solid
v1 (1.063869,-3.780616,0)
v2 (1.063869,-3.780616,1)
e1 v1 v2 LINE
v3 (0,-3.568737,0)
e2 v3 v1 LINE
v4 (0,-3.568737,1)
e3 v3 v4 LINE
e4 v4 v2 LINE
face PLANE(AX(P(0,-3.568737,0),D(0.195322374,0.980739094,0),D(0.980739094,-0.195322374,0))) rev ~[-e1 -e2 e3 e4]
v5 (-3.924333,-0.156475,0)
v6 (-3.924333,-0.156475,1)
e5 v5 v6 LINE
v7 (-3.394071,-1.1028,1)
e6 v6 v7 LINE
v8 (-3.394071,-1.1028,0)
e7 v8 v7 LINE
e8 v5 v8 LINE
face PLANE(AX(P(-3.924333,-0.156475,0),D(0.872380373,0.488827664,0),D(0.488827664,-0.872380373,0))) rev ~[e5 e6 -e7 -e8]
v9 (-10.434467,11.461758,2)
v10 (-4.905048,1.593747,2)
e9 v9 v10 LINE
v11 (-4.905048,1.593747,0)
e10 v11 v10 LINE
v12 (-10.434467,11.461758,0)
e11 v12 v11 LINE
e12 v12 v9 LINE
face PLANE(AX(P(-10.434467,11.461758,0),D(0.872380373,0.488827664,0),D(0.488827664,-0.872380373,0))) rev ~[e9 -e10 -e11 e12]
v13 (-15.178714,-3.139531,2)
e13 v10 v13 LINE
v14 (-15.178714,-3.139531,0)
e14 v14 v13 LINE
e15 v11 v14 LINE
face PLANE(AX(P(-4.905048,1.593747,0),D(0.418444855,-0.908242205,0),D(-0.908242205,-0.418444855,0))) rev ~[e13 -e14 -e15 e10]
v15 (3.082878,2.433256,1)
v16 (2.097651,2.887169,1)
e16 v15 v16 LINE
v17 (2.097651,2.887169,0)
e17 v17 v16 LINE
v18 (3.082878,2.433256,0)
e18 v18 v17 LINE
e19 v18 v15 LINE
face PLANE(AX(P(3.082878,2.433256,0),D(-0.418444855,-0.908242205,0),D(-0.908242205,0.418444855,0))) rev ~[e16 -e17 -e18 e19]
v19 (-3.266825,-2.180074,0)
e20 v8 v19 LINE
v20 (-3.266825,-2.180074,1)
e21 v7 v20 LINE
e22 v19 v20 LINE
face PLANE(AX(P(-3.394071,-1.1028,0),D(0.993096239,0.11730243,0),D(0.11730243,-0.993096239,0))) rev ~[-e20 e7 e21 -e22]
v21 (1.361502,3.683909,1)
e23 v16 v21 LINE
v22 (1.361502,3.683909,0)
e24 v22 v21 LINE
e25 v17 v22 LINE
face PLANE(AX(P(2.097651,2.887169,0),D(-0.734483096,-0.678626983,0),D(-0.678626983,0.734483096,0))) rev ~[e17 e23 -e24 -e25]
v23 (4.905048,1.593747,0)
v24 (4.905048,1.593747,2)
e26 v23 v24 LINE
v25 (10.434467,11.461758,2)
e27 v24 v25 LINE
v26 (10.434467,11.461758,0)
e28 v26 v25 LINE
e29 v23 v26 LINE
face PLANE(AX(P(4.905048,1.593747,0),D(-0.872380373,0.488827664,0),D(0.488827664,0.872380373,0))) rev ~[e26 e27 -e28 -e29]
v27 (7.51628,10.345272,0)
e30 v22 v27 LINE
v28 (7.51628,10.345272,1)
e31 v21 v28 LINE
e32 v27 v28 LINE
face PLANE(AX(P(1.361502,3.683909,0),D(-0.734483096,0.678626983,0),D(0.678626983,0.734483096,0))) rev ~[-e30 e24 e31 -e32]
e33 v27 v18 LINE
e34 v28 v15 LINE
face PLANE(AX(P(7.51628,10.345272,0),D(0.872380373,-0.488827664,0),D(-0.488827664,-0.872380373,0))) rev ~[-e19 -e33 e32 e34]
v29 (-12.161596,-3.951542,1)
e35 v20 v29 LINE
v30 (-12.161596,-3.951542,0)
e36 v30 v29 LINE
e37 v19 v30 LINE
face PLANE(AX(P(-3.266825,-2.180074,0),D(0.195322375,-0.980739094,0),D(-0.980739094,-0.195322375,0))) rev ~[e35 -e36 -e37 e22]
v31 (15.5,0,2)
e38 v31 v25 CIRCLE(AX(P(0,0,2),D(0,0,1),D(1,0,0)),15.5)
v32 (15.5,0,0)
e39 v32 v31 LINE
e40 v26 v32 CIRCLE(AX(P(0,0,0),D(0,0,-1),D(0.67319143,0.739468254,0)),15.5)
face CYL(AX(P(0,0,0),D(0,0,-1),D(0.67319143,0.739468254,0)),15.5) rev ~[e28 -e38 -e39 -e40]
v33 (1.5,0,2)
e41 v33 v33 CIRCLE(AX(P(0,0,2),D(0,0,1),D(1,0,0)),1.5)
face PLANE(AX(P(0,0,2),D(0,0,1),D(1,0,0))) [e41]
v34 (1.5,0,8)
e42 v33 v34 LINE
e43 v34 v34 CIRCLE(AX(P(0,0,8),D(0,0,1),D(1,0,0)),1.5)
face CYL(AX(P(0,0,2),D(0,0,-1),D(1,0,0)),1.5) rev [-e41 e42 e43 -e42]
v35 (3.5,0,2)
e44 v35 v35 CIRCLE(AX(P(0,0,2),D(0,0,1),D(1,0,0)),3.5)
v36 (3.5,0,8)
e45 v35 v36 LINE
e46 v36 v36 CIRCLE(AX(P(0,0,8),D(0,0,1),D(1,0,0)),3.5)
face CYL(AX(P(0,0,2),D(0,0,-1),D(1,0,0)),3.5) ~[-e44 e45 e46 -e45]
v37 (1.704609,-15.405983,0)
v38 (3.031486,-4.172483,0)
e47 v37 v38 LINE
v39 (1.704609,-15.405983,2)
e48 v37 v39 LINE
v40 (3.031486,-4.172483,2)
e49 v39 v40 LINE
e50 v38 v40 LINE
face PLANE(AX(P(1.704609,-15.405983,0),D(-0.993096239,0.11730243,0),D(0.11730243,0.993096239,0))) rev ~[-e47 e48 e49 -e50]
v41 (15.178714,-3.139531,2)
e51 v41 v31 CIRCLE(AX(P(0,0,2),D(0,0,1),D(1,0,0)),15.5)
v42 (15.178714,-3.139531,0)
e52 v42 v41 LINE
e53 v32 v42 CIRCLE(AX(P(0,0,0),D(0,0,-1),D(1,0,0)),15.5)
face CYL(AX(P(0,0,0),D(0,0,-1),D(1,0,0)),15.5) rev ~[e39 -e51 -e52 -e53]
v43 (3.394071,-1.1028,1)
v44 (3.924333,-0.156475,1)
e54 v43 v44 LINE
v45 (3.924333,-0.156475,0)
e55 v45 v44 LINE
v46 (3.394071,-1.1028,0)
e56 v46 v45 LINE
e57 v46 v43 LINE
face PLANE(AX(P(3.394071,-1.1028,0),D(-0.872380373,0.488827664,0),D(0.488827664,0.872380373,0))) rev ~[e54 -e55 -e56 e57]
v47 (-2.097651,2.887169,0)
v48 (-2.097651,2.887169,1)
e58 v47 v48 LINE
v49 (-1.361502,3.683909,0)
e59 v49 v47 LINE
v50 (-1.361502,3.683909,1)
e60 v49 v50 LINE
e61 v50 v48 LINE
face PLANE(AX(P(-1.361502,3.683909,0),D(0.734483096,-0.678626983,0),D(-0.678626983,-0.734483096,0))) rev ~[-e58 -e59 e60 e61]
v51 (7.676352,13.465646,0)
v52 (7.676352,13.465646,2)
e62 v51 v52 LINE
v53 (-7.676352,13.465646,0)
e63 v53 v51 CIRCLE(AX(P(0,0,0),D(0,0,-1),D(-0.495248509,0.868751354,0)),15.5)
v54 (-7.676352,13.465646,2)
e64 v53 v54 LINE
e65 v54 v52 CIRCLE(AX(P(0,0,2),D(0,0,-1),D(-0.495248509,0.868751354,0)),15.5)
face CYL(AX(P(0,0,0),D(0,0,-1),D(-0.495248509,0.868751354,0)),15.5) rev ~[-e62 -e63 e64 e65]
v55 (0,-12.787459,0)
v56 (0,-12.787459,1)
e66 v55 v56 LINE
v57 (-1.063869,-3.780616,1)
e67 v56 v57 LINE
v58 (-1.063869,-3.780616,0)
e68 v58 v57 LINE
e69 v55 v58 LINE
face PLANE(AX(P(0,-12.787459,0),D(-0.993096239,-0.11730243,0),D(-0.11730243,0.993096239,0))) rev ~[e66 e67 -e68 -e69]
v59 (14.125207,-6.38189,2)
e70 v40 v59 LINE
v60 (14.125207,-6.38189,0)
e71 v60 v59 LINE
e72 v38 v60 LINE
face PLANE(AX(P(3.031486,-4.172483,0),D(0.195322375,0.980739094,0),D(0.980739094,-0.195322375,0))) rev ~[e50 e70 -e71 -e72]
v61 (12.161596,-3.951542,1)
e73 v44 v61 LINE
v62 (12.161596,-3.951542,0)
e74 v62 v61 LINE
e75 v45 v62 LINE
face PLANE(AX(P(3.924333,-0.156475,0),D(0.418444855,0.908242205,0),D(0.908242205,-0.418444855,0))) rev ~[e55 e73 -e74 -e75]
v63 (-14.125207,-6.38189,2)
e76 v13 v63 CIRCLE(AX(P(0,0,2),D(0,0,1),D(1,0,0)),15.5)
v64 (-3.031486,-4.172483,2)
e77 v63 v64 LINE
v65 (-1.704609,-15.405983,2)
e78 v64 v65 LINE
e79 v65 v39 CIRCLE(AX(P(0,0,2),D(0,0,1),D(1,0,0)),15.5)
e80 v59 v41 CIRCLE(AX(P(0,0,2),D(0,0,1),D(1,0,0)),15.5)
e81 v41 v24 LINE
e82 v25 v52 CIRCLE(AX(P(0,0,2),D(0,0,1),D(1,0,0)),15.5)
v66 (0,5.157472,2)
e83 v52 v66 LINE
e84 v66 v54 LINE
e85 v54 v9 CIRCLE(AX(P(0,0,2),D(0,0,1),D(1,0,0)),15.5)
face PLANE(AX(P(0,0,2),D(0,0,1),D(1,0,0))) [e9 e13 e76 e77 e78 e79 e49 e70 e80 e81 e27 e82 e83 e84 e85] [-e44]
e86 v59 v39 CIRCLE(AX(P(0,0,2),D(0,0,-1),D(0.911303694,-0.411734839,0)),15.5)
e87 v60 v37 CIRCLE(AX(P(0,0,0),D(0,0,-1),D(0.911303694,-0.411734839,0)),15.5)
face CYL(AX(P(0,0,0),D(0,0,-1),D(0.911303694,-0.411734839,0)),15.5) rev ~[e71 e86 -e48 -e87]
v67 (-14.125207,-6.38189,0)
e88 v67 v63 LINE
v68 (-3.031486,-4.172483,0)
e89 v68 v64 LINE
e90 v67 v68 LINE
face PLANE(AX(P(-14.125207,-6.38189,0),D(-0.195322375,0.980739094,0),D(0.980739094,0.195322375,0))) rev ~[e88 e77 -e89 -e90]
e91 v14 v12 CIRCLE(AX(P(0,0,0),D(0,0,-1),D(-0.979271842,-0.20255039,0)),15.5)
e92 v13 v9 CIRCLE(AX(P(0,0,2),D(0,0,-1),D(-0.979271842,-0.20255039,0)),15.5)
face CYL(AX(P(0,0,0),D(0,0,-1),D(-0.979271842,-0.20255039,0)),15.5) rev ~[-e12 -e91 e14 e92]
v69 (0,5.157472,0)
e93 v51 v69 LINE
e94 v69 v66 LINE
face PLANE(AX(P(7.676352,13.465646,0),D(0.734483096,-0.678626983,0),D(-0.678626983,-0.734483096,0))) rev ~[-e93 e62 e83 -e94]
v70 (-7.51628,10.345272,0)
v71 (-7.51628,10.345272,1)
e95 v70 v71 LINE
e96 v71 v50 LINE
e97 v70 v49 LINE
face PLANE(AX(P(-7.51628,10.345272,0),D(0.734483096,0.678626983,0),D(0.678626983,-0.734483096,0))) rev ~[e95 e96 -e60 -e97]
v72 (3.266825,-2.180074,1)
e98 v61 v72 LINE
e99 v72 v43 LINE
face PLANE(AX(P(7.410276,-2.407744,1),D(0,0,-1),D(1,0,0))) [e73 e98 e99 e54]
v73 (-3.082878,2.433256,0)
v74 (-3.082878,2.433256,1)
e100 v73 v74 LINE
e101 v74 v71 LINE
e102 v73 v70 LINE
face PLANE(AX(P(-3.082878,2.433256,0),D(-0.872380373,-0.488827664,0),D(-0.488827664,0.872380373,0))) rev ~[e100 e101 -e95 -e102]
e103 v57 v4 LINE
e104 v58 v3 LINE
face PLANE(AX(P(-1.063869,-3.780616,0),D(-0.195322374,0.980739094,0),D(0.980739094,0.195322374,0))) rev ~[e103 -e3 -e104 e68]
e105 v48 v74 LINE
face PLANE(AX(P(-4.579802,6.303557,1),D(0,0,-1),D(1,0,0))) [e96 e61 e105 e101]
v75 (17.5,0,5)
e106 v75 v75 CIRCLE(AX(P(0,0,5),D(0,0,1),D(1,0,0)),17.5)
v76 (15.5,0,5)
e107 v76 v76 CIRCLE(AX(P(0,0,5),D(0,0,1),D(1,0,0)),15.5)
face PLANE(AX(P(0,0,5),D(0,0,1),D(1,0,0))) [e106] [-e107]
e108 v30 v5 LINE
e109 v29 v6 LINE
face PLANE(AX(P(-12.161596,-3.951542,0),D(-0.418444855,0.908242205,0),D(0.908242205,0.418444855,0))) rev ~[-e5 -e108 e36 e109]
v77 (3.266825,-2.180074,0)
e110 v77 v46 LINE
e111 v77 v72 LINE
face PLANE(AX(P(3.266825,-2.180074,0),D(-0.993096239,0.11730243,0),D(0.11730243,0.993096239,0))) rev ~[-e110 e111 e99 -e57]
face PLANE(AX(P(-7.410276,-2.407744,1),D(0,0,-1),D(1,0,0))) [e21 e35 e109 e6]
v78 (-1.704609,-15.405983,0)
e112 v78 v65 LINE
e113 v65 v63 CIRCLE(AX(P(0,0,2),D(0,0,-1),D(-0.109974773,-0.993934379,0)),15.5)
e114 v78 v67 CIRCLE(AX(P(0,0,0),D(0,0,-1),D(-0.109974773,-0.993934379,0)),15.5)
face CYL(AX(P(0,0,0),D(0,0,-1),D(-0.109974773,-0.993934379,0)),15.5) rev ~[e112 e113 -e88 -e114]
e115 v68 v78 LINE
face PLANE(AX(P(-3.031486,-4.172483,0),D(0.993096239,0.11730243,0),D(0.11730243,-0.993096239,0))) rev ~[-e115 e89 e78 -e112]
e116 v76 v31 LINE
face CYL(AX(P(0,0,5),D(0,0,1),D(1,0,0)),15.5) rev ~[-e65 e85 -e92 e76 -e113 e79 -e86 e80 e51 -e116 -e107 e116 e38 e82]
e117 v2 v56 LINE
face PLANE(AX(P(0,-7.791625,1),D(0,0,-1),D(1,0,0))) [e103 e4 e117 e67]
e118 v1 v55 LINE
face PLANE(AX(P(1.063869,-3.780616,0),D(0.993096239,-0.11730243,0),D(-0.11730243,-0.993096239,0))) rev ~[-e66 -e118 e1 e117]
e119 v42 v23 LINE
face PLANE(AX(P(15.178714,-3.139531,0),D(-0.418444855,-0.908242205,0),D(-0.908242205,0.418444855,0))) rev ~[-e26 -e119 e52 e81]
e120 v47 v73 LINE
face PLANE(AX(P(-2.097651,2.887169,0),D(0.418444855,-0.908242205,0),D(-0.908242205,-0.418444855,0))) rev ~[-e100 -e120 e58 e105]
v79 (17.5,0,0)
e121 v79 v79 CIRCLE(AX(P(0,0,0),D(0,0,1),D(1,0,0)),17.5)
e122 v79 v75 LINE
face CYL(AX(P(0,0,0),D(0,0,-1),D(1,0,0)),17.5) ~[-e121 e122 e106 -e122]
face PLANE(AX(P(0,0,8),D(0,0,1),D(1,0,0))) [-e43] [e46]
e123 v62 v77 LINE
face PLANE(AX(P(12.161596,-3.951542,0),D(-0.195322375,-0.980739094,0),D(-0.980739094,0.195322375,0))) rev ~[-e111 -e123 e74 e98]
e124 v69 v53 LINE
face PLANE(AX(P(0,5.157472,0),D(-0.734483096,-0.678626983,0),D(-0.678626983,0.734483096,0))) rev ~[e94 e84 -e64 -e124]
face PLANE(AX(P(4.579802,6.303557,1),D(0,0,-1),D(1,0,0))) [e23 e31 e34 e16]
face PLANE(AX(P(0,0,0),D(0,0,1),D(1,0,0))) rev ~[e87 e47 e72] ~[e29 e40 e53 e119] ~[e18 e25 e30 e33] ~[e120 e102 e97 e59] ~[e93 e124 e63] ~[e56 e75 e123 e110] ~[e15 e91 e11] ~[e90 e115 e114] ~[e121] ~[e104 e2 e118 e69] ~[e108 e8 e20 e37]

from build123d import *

# Parameters (mm, degrees)
F0_R     = 17.5
F1_DEPTH = 5
F2_R     = 15.5
F3_DEPTH = 3
F4_R     = 3.5
F4_R_2   = 1.5
F5_DEPTH = 6
F7_DEPTH = 1
F8_DEPTH = 2


with BuildPart() as f1:
    # F0 (on Top) → F1 (new body)
    with BuildSketch(Plane.XY):
        Circle(F0_R)
    extrude(amount=F1_DEPTH)

    # F2 (on face) → F3 (cut)
    with BuildSketch(Plane.XY.offset(5)):
        Circle(F2_R)
    extrude(amount=-F3_DEPTH, mode=Mode.SUBTRACT)

    # F4 (on face) → F5 (join)
    with BuildSketch(Plane.XY.offset(2)):
        Circle(F4_R)
        Circle(F4_R_2, mode=Mode.SUBTRACT)
    extrude(amount=F5_DEPTH)

    # F6 (on face) → F7 (cut)
    with BuildSketch(Plane(origin=(0, 0, 0), x_dir=(1, 0, 0), z_dir=(0, 0, -1))):
        Polygon((-3.9243327608, 0.1564746204), (-3.3940706843, 1.1028004157), (-3.2668253693, 2.1800742948), (-12.161596097, 3.9515421095), align=None)
        Polygon((1.0638693073, 3.7806155611), (0, 12.7874588824), (-1.0638693073, 3.7806155611), (0, 3.5687371109), align=None)
        Polygon((3.2668253693, 2.1800742948), (3.3940706843, 1.1028004157), (3.9243327608, 0.1564746204), (12.161596097, 3.9515421095), align=None)
        Polygon((3.0828784209, -2.4332555489), (2.0976510431, -2.8871689712), (1.361501722, -3.6839089274), (7.5162797454, -10.3452715508), align=None)
        Polygon((-1.361501722, -3.6839089274), (-2.0976510431, -2.8871689712), (-3.0828784209, -2.4332555489), (-7.5162797454, -10.3452715508), align=None)
    extrude(amount=-F7_DEPTH, mode=Mode.SUBTRACT)

    # F6 (on face) → F8 (cut)
    with BuildSketch(Plane(origin=(0, 0, 0), x_dir=(1, 0, 0), z_dir=(0, 0, -1))):
        with BuildLine():
            Line((7.6763518896, -13.4656459803), (0, -5.1574724983))
            Line((0, -5.1574724983), (-7.6763518896, -13.4656459803))
            ThreePointArc((-7.6763518896, -13.4656459803), (0, -15.5), (7.6763518896, -13.4656459803))
        make_face()
        with BuildLine():
            Line((-10.434467167, -11.4617579341), (-4.9050478272, -1.59374665))
            Line((-4.9050478272, -1.59374665), (-15.1787135444, 3.1395310378))
            ThreePointArc((-15.1787135444, 3.1395310378), (-14.7413760026, -4.7897634128), (-10.434467167, -11.4617579341))
        make_face()
        with BuildLine():
            Line((1.7046089863, 15.4059828704), (3.0314862736, 4.1724828992))
            Line((3.0314862736, 4.1724828992), (14.1252072533, 6.3818900062))
            ThreePointArc((14.1252072533, 6.3818900062), (9.1106714105, 12.5397634128), (1.7046089863, 15.4059828704))
        make_face()
        with BuildLine():
            Line((15.1787135444, 3.1395310378), (4.9050478272, -1.59374665))
            Line((4.9050478272, -1.59374665), (10.434467167, -11.4617579341))
            ThreePointArc((10.434467167, -11.4617579341), (14.1771689891, -6.2656108605), (15.5, 0))
            ThreePointArc((15.5, 0), (15.4194691857, 1.5779638877), (15.1787135444, 3.1395310378))
        make_face()
        with BuildLine():
            Line((-14.1252072533, 6.3818900062), (-3.0314862736, 4.1724828992))
            Line((-3.0314862736, 4.1724828992), (-1.7046089863, 15.4059828704))
            ThreePointArc((-1.7046089863, 15.4059828704), (-9.1106714105, 12.5397634128), (-14.1252072533, 6.3818900062))
        make_face()
    extrude(amount=-F8_DEPTH, mode=Mode.SUBTRACT)


solid = f1.part
